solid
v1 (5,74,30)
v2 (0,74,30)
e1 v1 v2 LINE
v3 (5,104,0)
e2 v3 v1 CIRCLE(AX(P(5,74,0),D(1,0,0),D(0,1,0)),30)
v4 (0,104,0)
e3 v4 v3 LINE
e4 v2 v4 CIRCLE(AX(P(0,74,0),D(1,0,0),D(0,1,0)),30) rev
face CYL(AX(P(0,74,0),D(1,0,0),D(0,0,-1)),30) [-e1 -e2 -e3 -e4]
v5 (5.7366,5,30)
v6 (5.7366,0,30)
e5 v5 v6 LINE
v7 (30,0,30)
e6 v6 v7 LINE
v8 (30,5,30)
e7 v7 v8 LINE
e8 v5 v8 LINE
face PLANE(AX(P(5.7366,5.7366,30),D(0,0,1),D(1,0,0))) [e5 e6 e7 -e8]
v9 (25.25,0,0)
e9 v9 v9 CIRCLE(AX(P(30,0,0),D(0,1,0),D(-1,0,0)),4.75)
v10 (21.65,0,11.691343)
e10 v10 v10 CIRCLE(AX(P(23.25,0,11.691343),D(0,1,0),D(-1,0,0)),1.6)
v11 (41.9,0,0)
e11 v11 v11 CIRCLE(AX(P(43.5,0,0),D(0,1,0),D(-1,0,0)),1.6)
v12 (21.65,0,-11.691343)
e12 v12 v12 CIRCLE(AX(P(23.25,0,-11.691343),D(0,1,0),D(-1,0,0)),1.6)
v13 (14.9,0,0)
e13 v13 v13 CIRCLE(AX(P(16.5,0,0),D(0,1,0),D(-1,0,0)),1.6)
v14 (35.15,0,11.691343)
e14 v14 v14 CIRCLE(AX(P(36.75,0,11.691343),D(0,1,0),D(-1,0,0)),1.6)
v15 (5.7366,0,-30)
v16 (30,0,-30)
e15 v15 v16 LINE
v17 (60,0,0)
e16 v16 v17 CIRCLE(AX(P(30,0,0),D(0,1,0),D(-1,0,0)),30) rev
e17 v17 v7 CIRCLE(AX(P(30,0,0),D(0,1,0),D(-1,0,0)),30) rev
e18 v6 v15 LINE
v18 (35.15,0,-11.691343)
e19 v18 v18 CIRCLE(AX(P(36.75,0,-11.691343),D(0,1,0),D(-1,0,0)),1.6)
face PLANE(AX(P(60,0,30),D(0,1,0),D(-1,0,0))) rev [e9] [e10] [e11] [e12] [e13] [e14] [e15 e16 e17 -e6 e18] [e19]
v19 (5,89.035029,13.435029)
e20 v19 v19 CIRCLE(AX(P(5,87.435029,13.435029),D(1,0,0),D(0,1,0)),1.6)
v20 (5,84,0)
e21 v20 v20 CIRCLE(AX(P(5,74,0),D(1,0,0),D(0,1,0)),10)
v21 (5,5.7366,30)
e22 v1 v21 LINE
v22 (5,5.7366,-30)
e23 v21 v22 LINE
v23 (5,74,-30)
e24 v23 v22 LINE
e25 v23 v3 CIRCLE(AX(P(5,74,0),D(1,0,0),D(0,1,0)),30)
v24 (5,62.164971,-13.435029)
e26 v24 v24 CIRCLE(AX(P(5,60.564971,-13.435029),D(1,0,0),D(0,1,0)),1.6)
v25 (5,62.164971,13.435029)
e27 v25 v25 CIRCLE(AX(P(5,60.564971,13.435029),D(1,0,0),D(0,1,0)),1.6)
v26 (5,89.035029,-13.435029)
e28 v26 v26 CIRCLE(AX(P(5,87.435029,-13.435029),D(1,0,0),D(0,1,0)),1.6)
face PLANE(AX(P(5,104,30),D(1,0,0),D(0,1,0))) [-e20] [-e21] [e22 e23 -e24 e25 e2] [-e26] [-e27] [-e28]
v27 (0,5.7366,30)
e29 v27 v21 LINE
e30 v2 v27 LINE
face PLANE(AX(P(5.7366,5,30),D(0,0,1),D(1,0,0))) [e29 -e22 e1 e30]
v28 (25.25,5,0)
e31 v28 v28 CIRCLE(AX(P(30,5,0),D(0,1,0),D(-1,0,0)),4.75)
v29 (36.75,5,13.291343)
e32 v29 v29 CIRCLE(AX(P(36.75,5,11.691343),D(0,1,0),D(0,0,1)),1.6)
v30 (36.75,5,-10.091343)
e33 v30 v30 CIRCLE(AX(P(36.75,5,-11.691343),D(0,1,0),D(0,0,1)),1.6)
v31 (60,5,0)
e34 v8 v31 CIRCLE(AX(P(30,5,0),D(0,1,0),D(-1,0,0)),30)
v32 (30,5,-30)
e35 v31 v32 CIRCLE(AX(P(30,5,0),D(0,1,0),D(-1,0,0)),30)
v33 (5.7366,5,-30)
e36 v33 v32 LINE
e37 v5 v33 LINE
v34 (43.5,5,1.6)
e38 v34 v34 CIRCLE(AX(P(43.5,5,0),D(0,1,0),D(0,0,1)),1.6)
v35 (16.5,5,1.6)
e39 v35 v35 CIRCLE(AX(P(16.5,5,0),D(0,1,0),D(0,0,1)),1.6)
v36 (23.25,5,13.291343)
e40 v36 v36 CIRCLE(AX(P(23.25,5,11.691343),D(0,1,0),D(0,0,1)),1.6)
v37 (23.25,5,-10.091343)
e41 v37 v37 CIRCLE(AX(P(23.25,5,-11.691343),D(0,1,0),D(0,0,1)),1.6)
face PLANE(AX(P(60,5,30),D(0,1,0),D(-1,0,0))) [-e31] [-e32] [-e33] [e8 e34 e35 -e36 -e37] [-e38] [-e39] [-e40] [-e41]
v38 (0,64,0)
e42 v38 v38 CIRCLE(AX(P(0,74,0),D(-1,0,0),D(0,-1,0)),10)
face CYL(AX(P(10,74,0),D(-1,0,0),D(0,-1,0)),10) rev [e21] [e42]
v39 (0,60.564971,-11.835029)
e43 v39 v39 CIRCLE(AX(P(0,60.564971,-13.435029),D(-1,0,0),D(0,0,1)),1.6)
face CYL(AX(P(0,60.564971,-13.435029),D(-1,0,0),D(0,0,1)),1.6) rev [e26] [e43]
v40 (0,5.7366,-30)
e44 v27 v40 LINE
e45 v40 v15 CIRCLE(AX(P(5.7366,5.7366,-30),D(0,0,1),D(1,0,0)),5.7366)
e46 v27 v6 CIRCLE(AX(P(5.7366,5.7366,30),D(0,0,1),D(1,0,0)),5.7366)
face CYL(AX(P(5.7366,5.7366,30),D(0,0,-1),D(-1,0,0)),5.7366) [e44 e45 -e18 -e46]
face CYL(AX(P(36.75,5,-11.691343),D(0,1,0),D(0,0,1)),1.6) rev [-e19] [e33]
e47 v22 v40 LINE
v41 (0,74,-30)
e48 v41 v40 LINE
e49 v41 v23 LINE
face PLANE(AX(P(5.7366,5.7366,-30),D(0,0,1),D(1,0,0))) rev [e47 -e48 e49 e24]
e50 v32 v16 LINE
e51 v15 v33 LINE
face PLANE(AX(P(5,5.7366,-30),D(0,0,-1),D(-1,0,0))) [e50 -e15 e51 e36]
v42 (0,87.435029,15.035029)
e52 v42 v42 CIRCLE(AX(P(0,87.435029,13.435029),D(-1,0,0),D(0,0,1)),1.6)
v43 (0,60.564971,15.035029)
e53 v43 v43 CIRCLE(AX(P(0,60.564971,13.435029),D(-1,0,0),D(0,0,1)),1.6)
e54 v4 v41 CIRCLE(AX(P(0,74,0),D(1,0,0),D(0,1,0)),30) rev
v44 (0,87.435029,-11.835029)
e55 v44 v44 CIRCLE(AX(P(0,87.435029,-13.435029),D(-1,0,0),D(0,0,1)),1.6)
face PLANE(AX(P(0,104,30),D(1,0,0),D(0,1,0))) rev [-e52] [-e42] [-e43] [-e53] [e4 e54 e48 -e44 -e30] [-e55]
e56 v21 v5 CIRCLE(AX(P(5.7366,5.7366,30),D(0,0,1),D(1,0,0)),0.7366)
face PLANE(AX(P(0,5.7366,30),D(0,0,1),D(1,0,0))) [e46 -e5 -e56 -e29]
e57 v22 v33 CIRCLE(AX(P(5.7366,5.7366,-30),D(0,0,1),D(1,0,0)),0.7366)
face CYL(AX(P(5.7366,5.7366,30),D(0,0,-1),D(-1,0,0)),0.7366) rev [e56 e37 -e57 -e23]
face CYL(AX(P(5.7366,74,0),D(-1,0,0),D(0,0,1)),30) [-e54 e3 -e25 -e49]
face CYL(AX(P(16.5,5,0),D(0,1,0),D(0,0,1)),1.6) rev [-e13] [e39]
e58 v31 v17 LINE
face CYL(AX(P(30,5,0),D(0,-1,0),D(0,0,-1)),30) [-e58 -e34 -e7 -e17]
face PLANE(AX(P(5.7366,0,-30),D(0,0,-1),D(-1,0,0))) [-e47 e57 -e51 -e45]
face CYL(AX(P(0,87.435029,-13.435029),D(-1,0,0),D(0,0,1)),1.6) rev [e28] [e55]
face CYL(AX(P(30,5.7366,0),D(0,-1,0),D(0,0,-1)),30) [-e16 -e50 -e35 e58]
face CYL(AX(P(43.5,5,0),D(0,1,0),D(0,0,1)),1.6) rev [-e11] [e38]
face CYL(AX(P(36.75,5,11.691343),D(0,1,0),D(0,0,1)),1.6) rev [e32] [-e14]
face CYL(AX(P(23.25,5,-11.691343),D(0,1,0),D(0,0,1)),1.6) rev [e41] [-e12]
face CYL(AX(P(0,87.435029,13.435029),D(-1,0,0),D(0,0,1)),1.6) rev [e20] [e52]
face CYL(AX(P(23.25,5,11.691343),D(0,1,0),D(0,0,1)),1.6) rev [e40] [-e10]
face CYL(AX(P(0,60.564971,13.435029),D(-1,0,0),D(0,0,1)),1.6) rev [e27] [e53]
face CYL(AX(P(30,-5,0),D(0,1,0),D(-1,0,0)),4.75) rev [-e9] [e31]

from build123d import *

# Parameters (mm, degrees)
SM_BASE_FLANGE_1_DEPTH  = 30
FILLET_1_R              = 30
SKETCH_2_R              = 4.75
CUT_EXTRUDE_1_DEPTH     = 10
HOLE_WIZARD_1_OUTLINE_R = 1.6
HOLE_WIZARD_1_DEPTH     = 5
SKETCH_5_R              = 10
CUT_EXTRUDE_2_DEPTH     = 10
HOLE_WIZARD_2_OUTLINE_R = 1.6
HOLE_WIZARD_2_DEPTH     = 5


# Read off the part's stored shape, not the designer's step: 孔1, 孔2
# Sheet-metal steps are written as plain solids
with BuildPart() as part:
    # Sketch 1 → 基体-法兰1 (new, symmetric)
    with BuildSketch(Plane.XY):
        with BuildLine():
            Line((60, 0), (5.7366, 0))
            ThreePointArc((5.7366, 0), (1.680211239, 1.680211239), (0, 5.7366))
            Line((0, 5.7366), (0, 104))
            Line((0, 104), (5, 104))
            Line((5, 104), (5, 5.7366))
            ThreePointArc((5, 5.7366), (5.215745145, 5.215745145), (5.7366, 5))
            Line((5.7366, 5), (60, 5))
            Line((60, 5), (60, 0))
        make_face()
    extrude(amount=SM_BASE_FLANGE_1_DEPTH, both=True)

    # 圆角1
    fillet_1_edges = [part.edges().sort_by_distance(p)[0] for p in [
        (60, 2.5, -30),
        (60, 2.5, 30),
        (2.5, 104, -30),
        (2.5, 104, 30),
    ]]
    fillet(fillet_1_edges, radius=FILLET_1_R - 0.0001)  # a hair under: the kernel refuses the full size

    # Sketch 2 → 切除-拉伸1 (cut)
    with BuildSketch(Plane(origin=(0, 5, 0), x_dir=(1, 0, 0), z_dir=(0, 1, 0))):
        with Locations(Location((30, 0, 0), (0, 0, 180))):
            Circle(SKETCH_2_R)
    extrude(amount=-CUT_EXTRUDE_1_DEPTH, mode=Mode.SUBTRACT)

    # 孔1 outline → 孔1 (cut)
    with BuildSketch(Plane(origin=(0, 0, 0), x_dir=(1, 0, 0), z_dir=(0, 1, 0))):
        with Locations((23.25, -11.691342951)):
            Circle(HOLE_WIZARD_1_OUTLINE_R)
        with Locations((16.5, 0)):
            Circle(HOLE_WIZARD_1_OUTLINE_R)
        with Locations((23.25, 11.691342951)):
            Circle(HOLE_WIZARD_1_OUTLINE_R)
        with Locations((36.75, 11.691342951)):
            Circle(HOLE_WIZARD_1_OUTLINE_R)
        with Locations((43.5, 0)):
            Circle(HOLE_WIZARD_1_OUTLINE_R)
        with Locations((36.75, -11.691342951)):
            Circle(HOLE_WIZARD_1_OUTLINE_R)
    extrude(amount=HOLE_WIZARD_1_DEPTH, mode=Mode.SUBTRACT)

    # 草图5 → 切除-拉伸2 (cut)
    with BuildSketch(Plane.ZY):
        with Locations(Location((0, 74, 0), (0, 0, 270))):
            Circle(SKETCH_5_R)
    extrude(amount=-CUT_EXTRUDE_2_DEPTH, mode=Mode.SUBTRACT)

    # 孔2 outline → 孔2 (cut)
    with BuildSketch(Plane.YZ):
        with Locations((60.564971157, 13.435028843)):
            Circle(HOLE_WIZARD_2_OUTLINE_R)
        with Locations((60.564971157, -13.435028843)):
            Circle(HOLE_WIZARD_2_OUTLINE_R)
        with Locations((87.435028843, -13.435028843)):
            Circle(HOLE_WIZARD_2_OUTLINE_R)
        with Locations((87.435028843, 13.435028843)):
            Circle(HOLE_WIZARD_2_OUTLINE_R)
    extrude(amount=HOLE_WIZARD_2_DEPTH, mode=Mode.SUBTRACT)


solid = part.part
